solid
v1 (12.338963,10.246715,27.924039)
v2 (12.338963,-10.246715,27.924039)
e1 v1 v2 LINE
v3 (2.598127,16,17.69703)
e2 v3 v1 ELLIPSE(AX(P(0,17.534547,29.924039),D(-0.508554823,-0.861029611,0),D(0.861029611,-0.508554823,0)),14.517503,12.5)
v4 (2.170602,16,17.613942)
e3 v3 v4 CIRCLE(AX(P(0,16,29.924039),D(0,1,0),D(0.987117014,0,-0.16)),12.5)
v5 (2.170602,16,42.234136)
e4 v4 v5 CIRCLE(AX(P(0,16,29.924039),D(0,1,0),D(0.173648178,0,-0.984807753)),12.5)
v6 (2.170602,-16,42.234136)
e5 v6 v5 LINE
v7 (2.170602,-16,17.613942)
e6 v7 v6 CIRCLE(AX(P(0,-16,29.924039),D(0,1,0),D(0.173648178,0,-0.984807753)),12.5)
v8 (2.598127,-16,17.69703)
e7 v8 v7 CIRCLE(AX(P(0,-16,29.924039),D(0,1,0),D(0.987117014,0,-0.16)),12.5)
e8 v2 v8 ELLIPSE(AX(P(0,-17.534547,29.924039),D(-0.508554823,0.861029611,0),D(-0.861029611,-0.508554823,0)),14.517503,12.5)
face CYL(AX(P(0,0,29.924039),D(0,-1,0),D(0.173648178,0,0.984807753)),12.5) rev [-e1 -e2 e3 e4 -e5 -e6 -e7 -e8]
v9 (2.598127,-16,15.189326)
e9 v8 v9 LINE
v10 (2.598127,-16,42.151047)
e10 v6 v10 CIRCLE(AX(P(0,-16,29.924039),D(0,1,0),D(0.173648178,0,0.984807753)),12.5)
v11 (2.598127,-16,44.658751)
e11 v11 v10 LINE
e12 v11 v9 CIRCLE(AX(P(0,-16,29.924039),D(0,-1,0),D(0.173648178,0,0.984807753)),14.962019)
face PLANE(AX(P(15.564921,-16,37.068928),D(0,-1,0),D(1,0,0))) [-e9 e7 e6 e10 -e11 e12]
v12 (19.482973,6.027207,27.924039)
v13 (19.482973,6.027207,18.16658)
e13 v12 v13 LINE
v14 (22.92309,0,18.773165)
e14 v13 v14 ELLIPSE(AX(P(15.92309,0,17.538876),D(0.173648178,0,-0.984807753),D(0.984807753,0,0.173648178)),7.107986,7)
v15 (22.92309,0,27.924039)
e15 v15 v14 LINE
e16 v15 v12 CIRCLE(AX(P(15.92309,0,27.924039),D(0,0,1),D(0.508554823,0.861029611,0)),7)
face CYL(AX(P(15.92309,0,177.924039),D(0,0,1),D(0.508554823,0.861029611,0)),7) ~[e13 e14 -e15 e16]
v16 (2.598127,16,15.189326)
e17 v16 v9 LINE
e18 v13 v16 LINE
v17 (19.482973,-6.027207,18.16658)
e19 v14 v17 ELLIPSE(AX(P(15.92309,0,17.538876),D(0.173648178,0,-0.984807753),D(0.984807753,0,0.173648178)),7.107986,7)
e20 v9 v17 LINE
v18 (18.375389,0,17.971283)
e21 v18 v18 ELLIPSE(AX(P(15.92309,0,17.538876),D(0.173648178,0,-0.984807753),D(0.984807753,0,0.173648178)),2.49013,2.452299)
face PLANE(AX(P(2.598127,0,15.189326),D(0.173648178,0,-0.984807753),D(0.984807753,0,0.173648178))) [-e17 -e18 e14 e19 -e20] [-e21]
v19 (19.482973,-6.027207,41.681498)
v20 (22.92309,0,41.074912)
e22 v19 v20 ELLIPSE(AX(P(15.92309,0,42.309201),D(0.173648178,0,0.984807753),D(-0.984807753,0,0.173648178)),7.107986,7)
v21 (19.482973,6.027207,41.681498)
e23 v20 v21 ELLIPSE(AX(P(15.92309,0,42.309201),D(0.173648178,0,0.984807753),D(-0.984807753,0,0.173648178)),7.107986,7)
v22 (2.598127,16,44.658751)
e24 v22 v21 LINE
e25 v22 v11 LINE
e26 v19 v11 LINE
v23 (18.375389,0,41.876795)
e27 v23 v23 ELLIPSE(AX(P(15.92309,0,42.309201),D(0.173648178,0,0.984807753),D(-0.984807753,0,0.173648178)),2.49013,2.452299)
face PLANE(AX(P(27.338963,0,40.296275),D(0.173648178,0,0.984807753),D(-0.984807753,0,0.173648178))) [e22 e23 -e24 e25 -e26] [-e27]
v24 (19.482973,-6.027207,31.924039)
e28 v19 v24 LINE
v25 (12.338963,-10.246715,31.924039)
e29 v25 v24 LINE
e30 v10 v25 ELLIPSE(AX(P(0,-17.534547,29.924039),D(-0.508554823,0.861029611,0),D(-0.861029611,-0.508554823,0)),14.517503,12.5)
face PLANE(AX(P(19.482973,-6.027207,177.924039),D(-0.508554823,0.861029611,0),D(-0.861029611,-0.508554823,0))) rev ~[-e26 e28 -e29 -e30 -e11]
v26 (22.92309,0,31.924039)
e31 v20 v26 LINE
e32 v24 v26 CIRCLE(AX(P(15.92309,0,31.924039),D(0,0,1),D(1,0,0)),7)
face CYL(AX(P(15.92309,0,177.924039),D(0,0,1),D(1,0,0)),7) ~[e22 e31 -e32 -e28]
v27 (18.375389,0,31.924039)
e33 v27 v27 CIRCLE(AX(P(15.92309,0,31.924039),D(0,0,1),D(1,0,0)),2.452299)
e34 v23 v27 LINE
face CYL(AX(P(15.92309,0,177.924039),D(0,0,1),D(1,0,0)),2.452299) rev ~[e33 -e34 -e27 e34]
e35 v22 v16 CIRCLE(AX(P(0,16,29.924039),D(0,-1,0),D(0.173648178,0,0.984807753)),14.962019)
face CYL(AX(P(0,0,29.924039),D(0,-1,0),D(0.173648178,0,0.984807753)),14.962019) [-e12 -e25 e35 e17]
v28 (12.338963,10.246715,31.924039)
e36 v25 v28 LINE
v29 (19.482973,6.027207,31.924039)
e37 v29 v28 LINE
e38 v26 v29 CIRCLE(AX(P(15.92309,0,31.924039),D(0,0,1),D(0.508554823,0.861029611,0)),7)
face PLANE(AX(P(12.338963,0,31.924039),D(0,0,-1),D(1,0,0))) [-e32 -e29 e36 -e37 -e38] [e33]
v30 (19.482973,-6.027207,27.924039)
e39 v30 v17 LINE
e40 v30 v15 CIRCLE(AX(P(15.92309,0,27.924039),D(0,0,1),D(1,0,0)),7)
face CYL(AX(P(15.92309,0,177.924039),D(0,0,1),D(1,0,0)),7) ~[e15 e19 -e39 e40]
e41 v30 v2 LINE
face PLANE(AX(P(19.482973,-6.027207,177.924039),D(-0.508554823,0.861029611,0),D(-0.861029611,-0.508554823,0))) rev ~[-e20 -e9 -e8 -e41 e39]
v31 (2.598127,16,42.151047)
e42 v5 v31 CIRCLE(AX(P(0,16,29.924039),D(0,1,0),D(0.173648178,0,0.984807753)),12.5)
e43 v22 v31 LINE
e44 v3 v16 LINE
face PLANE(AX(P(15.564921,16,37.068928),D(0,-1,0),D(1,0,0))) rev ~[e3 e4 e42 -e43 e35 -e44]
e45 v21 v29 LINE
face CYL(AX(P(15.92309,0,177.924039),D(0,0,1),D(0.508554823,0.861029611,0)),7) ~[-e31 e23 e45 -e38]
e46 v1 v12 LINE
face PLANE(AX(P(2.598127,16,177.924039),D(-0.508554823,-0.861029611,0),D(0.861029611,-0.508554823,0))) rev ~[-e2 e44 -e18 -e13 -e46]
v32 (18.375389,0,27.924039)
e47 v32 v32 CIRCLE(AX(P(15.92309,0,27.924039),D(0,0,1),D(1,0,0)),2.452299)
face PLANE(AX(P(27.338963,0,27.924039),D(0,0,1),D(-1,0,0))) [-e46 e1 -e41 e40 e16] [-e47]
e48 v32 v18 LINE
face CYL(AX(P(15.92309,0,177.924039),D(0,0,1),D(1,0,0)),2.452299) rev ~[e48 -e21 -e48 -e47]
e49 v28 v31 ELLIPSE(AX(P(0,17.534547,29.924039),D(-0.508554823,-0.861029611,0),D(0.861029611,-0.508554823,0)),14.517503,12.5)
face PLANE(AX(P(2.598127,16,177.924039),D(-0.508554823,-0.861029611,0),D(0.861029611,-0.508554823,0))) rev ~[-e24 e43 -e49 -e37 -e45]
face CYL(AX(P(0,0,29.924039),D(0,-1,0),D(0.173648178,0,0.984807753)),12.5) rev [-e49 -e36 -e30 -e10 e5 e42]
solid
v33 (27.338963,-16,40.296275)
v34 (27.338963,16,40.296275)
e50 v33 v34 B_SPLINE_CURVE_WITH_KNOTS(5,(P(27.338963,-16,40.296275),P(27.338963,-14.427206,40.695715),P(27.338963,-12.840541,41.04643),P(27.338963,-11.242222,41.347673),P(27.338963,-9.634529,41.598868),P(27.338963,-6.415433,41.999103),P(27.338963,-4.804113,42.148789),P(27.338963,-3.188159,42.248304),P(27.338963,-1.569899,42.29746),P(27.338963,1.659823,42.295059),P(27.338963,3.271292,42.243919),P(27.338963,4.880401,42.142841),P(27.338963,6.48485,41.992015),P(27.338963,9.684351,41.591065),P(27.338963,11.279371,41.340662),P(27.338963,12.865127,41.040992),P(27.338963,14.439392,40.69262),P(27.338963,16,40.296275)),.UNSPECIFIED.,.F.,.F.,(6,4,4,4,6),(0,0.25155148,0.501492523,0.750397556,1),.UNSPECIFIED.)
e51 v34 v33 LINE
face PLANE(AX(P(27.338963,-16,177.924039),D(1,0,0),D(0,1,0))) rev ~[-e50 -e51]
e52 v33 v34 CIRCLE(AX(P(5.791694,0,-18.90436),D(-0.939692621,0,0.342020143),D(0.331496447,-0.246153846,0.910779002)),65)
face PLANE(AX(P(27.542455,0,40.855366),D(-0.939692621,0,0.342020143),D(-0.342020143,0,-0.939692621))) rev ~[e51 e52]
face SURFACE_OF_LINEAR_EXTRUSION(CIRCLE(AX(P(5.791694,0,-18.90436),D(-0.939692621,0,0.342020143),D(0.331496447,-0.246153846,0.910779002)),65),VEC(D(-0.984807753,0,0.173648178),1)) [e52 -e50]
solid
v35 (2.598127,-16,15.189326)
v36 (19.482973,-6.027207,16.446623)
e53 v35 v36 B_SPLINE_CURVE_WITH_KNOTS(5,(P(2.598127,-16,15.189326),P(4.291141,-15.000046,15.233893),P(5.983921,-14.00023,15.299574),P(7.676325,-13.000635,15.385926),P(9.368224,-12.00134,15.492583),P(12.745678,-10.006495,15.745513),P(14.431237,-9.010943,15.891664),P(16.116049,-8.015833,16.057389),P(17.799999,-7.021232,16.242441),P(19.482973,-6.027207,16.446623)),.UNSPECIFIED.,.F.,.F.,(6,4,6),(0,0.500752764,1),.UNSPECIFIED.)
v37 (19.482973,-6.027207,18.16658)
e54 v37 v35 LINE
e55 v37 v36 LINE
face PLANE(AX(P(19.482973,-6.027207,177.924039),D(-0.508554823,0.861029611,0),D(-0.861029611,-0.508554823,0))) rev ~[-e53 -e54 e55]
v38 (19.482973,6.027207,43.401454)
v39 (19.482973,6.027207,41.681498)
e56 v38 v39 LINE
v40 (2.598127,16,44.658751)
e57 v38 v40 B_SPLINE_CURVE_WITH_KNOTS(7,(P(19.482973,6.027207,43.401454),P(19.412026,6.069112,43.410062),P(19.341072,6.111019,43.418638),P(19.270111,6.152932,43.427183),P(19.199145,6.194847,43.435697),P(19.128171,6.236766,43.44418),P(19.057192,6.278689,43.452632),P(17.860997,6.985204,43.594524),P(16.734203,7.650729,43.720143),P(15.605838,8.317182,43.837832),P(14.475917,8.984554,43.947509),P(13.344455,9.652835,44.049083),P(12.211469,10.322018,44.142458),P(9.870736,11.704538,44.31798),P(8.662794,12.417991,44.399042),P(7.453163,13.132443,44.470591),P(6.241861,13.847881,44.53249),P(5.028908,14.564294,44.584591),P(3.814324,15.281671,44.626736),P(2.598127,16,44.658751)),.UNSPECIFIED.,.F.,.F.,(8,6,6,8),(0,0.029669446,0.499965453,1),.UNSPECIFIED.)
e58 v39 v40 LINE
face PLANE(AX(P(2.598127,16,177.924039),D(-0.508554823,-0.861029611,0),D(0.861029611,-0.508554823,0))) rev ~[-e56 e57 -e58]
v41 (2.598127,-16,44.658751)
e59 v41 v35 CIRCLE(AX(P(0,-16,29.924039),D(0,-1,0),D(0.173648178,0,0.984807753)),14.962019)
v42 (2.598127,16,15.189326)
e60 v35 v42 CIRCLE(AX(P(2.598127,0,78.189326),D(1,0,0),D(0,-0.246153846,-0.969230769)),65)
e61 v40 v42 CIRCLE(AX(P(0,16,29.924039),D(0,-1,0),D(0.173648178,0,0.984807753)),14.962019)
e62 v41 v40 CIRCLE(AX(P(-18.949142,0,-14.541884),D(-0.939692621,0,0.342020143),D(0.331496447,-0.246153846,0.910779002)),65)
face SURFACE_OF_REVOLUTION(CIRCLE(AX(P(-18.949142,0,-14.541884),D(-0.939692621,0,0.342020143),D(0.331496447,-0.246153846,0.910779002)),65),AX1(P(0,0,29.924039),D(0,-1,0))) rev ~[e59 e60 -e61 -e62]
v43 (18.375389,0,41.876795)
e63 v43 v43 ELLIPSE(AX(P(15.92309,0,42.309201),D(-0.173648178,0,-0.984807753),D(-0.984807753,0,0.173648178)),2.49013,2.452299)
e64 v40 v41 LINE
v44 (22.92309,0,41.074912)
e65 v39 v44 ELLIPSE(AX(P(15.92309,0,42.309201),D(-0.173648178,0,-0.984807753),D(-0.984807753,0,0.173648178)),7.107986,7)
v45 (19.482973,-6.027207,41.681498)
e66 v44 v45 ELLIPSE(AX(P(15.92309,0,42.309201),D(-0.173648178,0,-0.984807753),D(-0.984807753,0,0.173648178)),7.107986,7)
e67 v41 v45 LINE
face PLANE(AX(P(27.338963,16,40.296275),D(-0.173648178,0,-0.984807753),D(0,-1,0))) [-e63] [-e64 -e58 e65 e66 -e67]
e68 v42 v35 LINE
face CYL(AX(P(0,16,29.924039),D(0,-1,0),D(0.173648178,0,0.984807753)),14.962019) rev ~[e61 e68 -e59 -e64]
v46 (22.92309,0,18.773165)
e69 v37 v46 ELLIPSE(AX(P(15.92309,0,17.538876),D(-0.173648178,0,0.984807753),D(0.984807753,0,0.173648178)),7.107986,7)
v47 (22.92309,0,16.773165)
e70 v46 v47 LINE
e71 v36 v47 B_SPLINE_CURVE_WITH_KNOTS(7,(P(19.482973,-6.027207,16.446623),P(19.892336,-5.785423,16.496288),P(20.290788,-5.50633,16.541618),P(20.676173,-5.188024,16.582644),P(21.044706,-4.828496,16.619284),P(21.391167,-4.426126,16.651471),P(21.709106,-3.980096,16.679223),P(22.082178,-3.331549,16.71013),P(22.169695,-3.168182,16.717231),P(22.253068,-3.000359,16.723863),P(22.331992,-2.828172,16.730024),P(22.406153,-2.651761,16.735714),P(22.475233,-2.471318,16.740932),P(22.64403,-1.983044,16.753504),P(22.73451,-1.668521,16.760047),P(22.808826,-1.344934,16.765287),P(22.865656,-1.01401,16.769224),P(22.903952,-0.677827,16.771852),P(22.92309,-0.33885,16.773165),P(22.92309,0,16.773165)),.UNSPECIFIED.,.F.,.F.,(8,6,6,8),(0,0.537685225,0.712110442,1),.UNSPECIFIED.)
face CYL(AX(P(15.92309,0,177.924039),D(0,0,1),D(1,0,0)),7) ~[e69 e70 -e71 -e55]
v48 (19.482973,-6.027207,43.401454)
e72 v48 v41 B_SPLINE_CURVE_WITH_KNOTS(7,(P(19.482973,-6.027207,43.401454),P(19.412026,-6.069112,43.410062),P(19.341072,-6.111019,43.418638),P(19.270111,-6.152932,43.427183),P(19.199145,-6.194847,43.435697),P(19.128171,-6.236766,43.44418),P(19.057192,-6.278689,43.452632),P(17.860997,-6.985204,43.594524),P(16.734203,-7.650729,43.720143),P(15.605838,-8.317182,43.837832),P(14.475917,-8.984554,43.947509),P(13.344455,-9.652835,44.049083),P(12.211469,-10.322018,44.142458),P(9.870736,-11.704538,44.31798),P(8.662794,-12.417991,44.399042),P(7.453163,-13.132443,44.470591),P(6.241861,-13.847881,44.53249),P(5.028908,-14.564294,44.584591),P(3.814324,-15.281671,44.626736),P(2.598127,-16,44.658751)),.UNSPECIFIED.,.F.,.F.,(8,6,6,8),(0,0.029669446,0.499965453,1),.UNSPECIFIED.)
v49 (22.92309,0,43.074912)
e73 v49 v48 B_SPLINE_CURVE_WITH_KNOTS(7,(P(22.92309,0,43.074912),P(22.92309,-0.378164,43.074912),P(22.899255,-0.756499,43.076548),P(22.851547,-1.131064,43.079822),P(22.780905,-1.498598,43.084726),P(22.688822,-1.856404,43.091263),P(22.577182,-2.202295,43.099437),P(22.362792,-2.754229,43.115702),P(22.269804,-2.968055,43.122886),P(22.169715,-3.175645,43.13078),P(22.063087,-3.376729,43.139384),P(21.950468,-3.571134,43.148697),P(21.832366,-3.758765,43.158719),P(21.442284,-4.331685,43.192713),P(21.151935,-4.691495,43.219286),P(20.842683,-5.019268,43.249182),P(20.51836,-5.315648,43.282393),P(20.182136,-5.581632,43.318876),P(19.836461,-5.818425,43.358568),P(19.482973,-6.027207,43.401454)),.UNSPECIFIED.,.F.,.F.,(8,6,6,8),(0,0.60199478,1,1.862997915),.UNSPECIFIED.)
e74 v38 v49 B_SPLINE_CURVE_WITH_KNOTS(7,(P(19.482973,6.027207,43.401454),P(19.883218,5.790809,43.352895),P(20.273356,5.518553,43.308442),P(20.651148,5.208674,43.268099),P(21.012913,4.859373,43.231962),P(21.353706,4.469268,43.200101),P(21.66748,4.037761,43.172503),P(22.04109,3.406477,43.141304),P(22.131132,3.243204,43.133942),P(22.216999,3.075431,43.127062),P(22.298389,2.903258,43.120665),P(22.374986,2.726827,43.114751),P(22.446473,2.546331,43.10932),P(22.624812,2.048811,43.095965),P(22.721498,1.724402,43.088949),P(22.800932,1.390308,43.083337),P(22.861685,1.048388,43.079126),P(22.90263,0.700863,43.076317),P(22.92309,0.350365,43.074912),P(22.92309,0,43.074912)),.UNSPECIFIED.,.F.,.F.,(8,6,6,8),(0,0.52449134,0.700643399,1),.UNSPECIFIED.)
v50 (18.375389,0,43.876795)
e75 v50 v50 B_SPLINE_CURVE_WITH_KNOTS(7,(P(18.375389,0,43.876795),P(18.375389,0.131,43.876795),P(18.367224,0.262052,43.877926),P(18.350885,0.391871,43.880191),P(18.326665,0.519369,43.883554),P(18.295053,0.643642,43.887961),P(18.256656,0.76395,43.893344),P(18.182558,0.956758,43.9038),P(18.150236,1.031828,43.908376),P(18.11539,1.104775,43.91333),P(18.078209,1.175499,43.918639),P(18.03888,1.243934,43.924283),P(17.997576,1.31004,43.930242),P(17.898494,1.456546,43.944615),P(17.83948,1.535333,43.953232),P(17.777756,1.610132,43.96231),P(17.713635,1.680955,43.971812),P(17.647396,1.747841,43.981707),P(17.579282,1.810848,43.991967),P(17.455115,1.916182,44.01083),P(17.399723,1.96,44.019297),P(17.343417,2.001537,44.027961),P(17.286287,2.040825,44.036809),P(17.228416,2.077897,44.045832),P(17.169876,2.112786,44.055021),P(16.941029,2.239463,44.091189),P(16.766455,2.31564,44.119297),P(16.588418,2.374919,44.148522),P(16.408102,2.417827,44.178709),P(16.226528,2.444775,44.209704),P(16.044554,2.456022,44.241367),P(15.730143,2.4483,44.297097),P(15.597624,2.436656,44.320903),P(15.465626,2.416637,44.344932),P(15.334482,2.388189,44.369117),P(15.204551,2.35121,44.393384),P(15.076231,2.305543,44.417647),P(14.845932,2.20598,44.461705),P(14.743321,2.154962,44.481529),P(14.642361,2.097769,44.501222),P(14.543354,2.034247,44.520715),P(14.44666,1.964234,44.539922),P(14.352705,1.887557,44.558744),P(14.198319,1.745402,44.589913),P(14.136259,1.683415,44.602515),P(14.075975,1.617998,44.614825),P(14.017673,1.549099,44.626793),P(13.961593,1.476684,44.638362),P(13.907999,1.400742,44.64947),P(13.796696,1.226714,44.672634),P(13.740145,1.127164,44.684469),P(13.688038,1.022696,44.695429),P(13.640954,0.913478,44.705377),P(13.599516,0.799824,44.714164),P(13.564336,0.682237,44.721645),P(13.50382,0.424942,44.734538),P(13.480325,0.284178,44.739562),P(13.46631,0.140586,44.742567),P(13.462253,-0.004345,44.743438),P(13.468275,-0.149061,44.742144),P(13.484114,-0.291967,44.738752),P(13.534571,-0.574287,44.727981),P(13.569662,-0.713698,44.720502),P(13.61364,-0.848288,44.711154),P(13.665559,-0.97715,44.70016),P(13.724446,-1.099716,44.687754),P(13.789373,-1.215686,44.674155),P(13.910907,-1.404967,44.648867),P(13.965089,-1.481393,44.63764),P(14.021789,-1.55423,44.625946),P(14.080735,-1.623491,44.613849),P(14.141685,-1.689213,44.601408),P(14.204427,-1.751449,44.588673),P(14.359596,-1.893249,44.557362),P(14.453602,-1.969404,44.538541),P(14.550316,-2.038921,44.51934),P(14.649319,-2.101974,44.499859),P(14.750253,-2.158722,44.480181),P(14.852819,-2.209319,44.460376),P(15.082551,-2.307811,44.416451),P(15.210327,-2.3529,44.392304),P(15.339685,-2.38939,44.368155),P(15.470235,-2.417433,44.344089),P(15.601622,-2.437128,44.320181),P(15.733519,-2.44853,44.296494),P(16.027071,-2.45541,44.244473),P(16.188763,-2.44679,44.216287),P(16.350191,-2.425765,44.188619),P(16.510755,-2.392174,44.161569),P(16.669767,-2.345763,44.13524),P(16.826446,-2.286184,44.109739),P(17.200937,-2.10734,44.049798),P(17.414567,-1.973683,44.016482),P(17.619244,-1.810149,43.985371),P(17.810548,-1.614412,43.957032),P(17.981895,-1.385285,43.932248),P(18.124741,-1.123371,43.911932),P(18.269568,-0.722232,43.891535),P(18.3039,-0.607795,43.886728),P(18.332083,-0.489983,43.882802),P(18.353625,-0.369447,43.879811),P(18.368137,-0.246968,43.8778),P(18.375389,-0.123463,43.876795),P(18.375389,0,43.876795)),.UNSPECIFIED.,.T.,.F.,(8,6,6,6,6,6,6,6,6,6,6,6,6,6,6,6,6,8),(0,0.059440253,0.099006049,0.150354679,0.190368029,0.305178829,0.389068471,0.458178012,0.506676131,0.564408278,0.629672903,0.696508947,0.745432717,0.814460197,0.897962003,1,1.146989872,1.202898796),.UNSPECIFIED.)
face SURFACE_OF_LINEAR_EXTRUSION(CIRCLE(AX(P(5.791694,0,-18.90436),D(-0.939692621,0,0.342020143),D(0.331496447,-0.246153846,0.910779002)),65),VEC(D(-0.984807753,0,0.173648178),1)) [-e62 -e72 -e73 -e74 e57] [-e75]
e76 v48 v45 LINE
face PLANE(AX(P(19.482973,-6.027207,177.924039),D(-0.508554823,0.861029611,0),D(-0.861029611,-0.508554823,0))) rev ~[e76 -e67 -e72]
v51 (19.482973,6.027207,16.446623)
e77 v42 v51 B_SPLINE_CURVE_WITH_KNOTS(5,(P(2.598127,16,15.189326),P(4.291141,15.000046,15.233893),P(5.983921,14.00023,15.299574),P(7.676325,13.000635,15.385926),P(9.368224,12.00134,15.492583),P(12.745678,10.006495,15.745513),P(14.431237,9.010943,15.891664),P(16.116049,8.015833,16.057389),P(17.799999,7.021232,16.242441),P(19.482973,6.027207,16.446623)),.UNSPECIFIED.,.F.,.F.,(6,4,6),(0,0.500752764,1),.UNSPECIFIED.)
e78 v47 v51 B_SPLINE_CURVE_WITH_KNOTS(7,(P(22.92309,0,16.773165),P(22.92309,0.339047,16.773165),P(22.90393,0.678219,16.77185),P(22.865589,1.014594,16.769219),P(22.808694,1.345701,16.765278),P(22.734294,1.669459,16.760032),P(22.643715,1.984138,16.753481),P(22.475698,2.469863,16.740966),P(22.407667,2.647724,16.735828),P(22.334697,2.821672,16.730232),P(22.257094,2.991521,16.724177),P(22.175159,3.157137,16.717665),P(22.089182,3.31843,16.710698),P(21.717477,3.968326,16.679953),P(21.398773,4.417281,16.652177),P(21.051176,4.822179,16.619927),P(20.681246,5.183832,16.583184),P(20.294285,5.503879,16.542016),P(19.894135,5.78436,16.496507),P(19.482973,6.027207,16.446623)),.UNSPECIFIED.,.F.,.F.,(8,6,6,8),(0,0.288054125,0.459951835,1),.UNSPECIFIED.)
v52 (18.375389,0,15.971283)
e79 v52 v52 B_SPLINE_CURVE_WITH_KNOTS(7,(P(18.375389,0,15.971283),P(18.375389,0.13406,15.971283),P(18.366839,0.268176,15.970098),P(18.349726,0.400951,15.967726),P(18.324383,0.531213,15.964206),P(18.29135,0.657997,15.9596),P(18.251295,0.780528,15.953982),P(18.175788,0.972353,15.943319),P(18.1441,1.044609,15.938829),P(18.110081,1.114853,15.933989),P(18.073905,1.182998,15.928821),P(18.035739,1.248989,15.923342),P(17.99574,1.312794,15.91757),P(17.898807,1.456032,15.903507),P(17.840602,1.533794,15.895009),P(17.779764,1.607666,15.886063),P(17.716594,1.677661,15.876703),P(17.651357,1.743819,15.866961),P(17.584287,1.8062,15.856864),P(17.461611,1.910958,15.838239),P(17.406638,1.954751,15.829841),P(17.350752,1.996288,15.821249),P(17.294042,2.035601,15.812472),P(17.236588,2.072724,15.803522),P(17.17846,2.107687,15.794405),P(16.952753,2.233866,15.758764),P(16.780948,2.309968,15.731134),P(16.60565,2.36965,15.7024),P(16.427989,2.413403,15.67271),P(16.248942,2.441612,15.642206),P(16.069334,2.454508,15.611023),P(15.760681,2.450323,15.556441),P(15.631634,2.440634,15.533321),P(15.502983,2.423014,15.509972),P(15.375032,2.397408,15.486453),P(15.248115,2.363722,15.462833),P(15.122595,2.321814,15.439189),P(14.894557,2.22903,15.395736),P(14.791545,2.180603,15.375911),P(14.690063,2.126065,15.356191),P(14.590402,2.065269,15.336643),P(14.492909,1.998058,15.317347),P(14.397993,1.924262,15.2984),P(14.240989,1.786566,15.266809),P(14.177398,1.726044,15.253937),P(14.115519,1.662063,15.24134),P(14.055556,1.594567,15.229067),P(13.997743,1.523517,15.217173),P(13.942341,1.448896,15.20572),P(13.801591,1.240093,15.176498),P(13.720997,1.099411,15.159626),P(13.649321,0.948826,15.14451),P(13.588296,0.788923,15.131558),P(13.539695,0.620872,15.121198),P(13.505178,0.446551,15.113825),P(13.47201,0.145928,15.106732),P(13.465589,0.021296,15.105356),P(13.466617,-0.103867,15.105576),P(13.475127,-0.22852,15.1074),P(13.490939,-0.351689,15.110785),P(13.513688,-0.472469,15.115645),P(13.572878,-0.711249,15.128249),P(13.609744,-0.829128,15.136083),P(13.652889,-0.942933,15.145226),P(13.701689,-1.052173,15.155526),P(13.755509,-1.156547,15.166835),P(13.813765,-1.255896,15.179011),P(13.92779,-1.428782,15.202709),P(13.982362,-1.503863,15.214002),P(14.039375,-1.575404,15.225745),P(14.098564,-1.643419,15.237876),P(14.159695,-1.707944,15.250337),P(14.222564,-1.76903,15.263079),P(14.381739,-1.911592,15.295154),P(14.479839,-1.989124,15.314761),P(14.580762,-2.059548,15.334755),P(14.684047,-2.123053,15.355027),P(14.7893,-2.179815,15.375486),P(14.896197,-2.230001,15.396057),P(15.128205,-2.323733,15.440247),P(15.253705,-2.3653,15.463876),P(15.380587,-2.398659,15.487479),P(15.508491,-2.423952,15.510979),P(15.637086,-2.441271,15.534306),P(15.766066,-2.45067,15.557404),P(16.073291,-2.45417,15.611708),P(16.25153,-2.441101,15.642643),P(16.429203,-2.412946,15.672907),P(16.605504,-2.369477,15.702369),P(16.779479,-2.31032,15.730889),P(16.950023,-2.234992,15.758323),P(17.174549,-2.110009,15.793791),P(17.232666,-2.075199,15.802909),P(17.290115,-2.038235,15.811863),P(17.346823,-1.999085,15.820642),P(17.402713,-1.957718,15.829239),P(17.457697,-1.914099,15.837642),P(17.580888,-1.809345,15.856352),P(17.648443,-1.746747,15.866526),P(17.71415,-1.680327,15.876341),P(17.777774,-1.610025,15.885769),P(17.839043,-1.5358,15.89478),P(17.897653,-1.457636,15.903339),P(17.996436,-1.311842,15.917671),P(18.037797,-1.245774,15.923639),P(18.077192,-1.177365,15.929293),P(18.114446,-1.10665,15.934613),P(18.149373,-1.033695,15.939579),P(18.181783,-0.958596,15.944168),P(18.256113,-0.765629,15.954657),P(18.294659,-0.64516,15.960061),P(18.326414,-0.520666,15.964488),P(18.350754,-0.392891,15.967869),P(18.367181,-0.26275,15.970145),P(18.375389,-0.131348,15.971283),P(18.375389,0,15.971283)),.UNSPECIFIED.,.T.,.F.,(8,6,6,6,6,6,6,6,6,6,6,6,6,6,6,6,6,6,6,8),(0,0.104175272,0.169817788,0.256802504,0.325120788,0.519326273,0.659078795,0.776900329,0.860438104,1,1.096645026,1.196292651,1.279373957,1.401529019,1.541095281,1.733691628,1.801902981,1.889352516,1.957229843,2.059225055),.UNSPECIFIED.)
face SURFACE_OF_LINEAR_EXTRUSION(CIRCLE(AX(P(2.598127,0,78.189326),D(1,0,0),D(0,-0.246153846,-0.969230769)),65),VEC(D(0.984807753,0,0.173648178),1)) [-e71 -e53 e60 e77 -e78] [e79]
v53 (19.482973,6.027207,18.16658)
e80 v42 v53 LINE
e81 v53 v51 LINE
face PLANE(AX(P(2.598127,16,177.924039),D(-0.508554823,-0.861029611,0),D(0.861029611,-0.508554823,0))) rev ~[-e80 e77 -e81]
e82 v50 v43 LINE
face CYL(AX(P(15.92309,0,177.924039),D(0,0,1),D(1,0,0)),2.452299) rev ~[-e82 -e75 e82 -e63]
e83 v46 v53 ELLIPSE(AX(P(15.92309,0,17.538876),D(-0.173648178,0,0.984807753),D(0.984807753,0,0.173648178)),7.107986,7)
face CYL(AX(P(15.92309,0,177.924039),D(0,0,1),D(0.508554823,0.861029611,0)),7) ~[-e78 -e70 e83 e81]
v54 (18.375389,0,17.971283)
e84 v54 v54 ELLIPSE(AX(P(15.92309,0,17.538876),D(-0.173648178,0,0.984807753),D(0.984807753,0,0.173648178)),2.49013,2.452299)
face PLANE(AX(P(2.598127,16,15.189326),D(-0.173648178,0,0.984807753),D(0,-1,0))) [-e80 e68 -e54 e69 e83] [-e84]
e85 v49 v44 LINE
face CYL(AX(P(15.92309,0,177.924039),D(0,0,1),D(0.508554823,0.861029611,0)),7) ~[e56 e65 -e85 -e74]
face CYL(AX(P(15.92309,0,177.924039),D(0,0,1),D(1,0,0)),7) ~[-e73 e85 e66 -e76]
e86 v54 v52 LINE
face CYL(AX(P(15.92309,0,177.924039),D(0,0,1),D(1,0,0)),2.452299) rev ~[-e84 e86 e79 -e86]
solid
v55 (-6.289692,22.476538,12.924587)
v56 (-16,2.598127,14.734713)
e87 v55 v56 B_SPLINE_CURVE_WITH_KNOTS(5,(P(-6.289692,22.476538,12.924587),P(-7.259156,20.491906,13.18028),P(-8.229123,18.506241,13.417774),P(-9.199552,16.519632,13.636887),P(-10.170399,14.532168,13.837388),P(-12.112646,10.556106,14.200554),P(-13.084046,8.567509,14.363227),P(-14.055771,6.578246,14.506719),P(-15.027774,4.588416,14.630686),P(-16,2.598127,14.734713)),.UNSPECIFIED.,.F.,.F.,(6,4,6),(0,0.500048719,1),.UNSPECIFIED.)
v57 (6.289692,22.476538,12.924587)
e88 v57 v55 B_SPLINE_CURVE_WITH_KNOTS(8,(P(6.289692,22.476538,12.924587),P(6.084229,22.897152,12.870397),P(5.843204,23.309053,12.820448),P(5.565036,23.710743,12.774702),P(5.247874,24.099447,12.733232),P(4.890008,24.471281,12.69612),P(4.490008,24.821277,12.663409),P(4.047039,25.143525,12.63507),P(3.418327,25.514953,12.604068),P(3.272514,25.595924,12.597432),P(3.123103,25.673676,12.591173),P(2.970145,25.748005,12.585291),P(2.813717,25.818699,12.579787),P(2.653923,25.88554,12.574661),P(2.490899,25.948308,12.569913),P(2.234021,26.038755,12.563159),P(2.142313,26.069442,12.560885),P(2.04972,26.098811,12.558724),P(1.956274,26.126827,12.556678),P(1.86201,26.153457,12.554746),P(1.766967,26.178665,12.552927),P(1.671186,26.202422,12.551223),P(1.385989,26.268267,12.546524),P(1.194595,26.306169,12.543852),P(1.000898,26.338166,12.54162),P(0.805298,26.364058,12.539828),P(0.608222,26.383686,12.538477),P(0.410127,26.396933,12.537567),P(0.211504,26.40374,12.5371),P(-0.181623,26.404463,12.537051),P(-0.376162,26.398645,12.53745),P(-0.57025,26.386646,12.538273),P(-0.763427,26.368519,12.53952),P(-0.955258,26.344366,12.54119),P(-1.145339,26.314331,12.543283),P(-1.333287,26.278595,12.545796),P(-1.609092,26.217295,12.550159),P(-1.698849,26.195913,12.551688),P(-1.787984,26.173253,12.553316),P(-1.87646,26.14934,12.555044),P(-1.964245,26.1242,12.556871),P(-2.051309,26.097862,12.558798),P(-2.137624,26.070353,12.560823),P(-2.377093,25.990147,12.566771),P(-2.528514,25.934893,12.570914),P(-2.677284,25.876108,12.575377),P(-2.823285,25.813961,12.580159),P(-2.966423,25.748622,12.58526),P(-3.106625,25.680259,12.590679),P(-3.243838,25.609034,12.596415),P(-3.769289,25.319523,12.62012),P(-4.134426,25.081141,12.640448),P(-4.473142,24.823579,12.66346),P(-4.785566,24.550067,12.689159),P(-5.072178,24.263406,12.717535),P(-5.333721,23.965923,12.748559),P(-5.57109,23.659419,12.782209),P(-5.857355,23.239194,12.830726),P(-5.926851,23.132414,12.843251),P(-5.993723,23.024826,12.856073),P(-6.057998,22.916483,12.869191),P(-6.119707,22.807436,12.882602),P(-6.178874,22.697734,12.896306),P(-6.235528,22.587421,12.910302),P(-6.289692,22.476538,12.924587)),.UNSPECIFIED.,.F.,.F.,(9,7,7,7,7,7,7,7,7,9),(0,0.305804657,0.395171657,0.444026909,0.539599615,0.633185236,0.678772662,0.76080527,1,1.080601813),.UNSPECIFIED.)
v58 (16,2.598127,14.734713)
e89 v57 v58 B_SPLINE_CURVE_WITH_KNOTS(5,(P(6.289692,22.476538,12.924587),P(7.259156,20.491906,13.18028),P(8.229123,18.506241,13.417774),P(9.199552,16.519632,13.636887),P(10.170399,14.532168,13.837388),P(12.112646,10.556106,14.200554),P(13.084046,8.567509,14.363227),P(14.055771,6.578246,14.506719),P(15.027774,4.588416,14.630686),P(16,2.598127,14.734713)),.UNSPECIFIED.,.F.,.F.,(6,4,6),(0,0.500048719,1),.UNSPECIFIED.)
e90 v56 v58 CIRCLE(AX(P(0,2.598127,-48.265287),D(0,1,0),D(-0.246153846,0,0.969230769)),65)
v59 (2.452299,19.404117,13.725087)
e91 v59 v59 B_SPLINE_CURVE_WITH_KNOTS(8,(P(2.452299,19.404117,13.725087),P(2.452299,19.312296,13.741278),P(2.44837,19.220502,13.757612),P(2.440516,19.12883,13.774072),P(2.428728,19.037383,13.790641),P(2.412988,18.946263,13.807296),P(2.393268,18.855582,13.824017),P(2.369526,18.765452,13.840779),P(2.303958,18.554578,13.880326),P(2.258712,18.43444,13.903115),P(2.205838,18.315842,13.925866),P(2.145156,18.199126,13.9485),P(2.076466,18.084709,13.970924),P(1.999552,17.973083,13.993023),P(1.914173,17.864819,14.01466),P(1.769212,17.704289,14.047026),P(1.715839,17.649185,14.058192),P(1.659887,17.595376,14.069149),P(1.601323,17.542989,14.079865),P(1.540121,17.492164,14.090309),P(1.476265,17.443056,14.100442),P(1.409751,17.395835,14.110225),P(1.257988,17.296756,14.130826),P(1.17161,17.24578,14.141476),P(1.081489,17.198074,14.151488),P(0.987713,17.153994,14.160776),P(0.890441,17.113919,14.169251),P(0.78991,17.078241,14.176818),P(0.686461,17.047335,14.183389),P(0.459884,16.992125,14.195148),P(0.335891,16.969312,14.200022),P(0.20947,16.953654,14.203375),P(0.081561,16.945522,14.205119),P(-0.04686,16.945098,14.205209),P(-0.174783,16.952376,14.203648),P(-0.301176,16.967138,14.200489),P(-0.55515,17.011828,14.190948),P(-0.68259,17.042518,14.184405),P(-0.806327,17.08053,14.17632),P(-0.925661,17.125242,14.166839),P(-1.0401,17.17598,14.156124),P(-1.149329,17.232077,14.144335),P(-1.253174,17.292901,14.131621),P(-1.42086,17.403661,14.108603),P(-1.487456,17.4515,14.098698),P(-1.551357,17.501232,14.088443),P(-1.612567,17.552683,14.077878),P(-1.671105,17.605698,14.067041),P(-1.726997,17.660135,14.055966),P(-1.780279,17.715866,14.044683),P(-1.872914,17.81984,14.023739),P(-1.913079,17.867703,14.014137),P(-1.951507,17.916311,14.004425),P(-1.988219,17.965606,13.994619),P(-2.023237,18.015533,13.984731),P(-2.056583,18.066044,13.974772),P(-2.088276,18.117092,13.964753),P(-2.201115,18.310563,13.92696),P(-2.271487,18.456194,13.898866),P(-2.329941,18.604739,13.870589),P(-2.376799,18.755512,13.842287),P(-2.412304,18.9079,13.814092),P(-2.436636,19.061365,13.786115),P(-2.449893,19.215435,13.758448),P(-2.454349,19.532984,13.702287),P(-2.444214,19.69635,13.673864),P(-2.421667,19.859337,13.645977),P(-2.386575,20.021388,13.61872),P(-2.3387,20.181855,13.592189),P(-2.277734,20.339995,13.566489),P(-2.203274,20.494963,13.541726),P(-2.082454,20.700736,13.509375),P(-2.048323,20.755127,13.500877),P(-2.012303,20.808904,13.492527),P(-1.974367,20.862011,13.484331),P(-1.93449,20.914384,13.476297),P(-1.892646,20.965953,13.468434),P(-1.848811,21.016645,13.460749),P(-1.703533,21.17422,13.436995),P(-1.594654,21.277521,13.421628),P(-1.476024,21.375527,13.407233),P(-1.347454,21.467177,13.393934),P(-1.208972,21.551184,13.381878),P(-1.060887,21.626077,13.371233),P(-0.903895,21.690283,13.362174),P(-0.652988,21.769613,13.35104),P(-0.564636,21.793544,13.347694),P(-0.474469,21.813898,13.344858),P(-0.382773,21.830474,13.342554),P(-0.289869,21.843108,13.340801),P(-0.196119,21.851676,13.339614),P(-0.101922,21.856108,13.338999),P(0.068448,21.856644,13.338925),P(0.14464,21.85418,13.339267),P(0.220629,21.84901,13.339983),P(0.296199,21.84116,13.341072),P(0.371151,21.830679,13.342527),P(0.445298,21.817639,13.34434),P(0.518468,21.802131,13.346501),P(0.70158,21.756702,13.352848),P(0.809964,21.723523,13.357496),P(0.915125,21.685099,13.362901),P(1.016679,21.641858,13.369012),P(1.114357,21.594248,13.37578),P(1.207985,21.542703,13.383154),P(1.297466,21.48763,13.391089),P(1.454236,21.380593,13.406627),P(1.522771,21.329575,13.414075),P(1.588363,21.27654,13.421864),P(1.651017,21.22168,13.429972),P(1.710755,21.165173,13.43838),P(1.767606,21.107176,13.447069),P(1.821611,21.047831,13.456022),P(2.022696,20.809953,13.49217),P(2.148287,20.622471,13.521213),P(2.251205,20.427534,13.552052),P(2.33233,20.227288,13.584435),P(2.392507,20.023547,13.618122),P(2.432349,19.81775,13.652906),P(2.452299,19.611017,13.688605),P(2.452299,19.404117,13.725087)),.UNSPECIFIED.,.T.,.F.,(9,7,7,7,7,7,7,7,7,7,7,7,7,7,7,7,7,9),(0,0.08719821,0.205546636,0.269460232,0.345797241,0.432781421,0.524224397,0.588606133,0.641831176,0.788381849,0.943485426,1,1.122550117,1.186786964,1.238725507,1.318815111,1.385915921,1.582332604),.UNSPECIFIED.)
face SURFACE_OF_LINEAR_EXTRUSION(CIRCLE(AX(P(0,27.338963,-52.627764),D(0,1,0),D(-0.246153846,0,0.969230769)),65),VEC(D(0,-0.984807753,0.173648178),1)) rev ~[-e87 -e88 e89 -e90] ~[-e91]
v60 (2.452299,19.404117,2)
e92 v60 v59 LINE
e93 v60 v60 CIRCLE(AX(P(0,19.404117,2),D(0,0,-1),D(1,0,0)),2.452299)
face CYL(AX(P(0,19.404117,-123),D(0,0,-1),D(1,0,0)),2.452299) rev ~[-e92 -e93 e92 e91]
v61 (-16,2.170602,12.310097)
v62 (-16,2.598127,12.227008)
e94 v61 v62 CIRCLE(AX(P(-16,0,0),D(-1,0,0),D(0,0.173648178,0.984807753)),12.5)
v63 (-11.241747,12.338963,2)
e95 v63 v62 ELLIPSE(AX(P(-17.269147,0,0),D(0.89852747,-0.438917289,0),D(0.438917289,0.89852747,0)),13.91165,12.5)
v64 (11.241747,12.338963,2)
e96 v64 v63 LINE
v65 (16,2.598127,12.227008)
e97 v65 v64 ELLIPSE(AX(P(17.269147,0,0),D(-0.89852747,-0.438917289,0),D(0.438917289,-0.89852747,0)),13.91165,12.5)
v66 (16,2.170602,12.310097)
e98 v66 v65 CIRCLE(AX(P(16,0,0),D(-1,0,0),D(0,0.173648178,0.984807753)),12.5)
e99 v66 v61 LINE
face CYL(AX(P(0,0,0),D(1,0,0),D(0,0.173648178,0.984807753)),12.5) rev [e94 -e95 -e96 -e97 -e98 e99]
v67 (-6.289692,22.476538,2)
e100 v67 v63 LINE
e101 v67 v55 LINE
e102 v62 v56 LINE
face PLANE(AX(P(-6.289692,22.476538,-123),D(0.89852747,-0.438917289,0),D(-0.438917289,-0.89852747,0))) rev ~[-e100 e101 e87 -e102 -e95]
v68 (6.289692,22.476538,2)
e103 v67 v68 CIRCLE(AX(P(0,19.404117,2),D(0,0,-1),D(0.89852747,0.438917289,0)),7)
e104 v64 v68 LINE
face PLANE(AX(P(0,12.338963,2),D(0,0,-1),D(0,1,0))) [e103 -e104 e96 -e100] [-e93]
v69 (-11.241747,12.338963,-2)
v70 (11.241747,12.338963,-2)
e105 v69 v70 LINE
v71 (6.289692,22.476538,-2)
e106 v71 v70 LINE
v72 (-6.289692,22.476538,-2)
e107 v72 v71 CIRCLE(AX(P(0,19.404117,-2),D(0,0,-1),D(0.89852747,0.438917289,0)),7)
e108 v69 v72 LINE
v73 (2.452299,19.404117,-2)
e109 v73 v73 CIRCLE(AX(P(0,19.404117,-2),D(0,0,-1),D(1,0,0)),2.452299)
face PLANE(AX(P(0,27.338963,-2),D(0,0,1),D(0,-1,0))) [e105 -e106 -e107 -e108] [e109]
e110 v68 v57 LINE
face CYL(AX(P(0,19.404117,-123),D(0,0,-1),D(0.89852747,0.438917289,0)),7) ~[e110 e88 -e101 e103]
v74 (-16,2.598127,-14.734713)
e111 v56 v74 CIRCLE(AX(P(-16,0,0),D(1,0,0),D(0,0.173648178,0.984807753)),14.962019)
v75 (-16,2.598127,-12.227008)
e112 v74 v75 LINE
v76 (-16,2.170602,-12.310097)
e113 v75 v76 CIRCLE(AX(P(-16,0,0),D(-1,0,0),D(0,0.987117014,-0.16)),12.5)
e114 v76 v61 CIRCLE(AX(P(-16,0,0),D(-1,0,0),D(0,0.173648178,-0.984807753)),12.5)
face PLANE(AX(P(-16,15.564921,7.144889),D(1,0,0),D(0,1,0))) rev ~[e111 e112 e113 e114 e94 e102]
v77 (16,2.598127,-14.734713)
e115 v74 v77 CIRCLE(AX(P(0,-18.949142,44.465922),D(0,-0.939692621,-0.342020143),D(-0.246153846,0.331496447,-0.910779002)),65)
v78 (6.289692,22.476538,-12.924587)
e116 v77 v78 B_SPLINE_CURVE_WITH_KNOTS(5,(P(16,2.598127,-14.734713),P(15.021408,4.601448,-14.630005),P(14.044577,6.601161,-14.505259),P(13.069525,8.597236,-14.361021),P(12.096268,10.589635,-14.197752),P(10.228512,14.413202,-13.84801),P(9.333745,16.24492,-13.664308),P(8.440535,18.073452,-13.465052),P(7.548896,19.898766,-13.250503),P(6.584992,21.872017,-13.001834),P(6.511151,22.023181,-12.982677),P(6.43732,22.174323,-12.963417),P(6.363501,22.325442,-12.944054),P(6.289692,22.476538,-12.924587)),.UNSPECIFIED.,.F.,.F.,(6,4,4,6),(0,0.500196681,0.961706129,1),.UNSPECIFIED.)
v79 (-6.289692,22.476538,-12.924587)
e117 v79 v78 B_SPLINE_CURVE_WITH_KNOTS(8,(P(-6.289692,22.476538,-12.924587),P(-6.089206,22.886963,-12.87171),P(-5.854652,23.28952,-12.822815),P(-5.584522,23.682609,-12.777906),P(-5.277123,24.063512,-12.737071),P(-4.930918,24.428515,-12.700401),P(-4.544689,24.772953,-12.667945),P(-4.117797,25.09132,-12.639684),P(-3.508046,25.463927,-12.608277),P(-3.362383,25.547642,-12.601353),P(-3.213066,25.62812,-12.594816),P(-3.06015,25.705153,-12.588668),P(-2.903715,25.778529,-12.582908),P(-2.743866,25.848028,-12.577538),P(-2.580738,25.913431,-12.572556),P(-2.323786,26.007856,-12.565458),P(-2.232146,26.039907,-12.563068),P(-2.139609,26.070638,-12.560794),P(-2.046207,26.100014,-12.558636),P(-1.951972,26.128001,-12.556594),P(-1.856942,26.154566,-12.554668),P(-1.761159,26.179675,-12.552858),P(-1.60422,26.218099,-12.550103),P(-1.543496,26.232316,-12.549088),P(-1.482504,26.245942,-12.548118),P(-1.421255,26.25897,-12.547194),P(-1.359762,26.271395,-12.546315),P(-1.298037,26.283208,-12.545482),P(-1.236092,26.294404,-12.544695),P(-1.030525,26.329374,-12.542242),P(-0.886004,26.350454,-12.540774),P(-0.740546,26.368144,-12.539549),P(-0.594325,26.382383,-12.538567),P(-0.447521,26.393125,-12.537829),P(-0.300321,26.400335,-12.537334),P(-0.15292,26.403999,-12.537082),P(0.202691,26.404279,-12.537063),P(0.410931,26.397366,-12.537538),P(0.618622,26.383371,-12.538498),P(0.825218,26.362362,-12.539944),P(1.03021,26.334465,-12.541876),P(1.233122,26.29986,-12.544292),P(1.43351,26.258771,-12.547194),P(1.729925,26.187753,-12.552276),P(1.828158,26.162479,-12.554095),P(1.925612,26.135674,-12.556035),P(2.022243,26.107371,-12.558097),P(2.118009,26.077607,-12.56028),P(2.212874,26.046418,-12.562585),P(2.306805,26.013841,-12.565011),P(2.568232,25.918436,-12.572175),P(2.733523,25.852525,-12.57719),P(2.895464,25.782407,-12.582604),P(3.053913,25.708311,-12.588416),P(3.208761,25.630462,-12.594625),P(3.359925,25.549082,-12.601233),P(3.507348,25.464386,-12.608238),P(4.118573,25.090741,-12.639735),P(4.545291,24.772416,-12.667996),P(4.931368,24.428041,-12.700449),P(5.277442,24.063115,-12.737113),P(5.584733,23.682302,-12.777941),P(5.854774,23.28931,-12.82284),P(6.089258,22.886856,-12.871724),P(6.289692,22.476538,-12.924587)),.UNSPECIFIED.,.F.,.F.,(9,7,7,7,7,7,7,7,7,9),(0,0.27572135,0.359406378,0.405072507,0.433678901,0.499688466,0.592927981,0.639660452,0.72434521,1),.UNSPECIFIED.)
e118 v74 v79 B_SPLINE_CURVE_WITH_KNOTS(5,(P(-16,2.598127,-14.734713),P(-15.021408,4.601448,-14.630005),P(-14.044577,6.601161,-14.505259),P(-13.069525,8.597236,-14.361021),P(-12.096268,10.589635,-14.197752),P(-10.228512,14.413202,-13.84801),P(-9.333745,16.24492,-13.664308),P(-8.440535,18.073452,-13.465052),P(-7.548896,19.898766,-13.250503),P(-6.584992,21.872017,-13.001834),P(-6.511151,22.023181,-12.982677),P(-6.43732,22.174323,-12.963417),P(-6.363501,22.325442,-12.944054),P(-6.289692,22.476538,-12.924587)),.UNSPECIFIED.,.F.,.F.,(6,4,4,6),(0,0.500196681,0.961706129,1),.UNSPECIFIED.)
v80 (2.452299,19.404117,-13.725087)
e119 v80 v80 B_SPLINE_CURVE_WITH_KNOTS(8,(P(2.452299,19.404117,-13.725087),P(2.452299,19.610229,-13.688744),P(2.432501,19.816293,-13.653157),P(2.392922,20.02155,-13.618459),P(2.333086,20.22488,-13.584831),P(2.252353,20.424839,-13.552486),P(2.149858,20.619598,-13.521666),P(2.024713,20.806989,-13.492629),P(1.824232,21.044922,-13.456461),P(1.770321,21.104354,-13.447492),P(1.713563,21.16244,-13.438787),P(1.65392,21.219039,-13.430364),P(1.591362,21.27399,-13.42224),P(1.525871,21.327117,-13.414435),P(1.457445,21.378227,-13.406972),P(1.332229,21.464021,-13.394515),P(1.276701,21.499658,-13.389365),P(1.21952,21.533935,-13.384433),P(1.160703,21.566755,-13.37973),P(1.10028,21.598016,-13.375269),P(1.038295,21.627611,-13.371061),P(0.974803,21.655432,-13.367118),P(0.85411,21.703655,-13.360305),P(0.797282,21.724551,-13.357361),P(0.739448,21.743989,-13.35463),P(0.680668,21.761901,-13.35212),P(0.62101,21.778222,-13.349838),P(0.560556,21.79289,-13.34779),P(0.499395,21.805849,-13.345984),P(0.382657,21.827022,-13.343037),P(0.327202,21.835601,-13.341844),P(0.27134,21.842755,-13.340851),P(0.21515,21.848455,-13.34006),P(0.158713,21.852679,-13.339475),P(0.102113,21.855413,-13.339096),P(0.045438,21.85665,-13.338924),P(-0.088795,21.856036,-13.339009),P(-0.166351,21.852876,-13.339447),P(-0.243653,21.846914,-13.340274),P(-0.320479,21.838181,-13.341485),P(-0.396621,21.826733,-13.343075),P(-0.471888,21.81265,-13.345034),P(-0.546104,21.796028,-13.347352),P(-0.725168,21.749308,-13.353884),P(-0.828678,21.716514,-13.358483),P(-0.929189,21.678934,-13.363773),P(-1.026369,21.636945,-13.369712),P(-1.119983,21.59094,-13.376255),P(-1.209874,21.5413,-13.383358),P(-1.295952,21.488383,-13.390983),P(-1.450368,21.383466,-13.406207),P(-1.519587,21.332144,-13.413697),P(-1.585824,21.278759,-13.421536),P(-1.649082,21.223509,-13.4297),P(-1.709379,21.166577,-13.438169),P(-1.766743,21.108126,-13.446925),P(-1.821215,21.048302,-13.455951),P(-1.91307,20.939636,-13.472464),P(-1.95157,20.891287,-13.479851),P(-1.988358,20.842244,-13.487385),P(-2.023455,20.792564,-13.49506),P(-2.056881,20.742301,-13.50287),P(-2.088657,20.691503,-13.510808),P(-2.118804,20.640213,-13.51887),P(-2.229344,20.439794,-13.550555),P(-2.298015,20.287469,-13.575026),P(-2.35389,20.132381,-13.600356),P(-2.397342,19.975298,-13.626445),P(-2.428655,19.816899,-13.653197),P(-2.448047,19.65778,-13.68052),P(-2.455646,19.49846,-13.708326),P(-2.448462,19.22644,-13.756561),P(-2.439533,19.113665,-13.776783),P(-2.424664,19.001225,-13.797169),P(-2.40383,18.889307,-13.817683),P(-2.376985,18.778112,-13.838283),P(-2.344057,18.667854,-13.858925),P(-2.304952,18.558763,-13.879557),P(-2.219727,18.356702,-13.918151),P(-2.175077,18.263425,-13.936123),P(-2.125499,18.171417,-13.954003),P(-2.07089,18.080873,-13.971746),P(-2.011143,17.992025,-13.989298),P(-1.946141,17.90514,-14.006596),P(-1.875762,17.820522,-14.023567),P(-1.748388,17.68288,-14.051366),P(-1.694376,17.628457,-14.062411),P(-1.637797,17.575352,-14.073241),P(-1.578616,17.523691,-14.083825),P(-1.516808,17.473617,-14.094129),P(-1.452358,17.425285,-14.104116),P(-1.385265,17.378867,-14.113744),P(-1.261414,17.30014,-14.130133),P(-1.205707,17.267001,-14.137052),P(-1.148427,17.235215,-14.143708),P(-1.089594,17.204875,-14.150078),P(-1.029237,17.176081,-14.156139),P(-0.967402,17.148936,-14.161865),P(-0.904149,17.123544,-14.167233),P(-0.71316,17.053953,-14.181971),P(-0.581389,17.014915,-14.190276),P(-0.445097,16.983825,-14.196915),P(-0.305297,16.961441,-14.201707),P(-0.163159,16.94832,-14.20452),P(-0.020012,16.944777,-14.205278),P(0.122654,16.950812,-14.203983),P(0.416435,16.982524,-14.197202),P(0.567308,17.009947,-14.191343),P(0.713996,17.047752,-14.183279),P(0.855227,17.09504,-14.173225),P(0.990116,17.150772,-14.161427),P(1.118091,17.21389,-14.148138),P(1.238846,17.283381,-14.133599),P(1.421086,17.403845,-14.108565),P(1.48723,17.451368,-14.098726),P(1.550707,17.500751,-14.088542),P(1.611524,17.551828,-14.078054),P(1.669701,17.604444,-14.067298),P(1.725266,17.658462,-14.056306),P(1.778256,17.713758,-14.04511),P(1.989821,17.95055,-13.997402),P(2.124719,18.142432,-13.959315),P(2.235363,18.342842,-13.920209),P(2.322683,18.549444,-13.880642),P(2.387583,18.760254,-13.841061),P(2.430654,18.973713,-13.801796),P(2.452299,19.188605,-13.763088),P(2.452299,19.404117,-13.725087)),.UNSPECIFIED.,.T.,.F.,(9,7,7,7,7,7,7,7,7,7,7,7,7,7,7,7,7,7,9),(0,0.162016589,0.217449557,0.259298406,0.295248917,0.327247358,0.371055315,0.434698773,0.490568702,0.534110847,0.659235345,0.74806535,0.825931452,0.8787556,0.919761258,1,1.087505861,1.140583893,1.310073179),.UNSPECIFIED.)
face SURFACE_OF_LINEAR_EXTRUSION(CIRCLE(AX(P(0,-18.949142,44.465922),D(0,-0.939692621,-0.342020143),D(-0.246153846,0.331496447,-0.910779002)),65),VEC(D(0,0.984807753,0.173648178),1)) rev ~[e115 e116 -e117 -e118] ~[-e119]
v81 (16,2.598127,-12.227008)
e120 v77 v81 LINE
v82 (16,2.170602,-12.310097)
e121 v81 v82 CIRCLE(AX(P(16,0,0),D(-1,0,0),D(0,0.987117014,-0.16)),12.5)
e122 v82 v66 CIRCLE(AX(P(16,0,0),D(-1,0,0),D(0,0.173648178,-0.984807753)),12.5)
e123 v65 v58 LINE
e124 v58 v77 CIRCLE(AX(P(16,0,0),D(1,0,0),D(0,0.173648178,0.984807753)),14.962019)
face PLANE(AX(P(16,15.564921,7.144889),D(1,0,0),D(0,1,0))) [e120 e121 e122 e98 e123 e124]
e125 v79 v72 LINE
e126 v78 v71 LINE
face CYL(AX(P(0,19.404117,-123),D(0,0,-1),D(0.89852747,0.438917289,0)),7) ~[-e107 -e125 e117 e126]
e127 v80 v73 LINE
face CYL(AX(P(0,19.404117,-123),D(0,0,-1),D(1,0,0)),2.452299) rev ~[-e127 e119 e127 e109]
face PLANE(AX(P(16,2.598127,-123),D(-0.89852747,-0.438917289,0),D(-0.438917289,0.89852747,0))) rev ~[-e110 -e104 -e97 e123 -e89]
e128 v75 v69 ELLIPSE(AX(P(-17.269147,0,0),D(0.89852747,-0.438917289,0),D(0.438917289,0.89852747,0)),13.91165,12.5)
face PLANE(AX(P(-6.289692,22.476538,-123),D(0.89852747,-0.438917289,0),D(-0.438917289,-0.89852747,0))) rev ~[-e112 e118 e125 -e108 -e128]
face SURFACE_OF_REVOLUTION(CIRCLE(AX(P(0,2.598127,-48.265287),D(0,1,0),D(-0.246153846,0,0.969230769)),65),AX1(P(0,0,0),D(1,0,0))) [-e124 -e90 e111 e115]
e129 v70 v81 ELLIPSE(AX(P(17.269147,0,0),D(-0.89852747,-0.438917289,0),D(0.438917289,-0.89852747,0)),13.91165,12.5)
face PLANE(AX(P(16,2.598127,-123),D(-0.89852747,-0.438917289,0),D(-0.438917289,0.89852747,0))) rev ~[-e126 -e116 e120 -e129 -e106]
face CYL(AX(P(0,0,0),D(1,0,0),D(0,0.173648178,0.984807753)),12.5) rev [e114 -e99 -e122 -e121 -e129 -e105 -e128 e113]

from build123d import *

# Parameters (mm, degrees)
F1_DEPTH  = 16
F5_DEPTH  = 16
F10_START = -25
F9_R      = 2.4522993316
F10_DEPTH = 167.5566196442
F12_R     = 2.4522993316
F13_DEPTH = 195.4795867205


with BuildPart() as f1:
    # F0 (on Right) → F1 (new body, symmetric)
    with BuildSketch(Plane.YZ):
        with BuildLine():
            Line((27.3389626793, 2), (27.3389626793, 7.8722359036))
            Line((27.3389626793, 7.8722359036), (2.1706022208, 12.3100969127))
            ThreePointArc((2.1706022208, 12.3100969127), (8.8997973564, 8.777448776), (12.3389626793, 2))
            Line((12.3389626793, 2), (27.3389626793, 2))
        make_face()
        with BuildLine():
            Line((27.3389626793, 10.3722359036), (2.5981274, 14.7347126886))
            ThreePointArc((2.5981274, 14.7347126886), (-14.9620193825, 0), (2.5981274, -14.7347126886))
            Line((2.5981274, -14.7347126886), (27.3389626793, -10.3722359036))
            Line((27.3389626793, -10.3722359036), (27.3389626793, -7.8722359036))
            Line((27.3389626793, -7.8722359036), (2.1706022208, -12.3100969127))
            ThreePointArc((2.1706022208, -12.3100969127), (-12.5, 0), (2.1706022208, 12.3100969127))
            Line((2.1706022208, 12.3100969127), (27.3389626793, 7.8722359036))
            Line((27.3389626793, 7.8722359036), (27.3389626793, 10.3722359036))
        make_face()
        with BuildLine():
            Line((2.1706022208, -12.3100969127), (27.3389626793, -7.8722359036))
            Line((27.3389626793, -7.8722359036), (27.3389626793, -2))
            Line((27.3389626793, -2), (12.3389626793, -2))
            ThreePointArc((12.3389626793, -2), (8.8997973564, -8.777448776), (2.1706022208, -12.3100969127))
        make_face()
    extrude(amount=F1_DEPTH, both=True)

    # F3: sweep along a path in F3_path
    with BuildLine(Plane(origin=(16, 27.3389626793, 10.3722359036), x_dir=(0, 0, 1), z_dir=(1, 0, 0))) as f3_path:
        Line((0, 0), (4.362476785, 24.7408352793))
        ThreePointArc((4.362476785, 24.7408352793), (-10.3722359036, 42.3009820618), (-25.1069485923, 24.7408352793))
        Line((-25.1069485923, 24.7408352793), (-20.7444718073, 0))
    # F2 (on face) → F3 (sweep)
    with BuildSketch(Plane(origin=(0, 27.3389626793, 0), x_dir=(-1, 0, 0), z_dir=(0, 1, 0))):
        with BuildLine():
            Line((-16, 10.3722359036), (16, 10.3722359036))
            ThreePointArc((16, 10.3722359036), (0, 12.3722359036), (-16, 10.3722359036))
        make_face()
    sweep(path=f3_path.line)

    # F9 (on offset) → F10 (cut)
    with BuildSketch(Plane(origin=(0, 0, -148), x_dir=(1, 0, 0), z_dir=(0, 0, -1)).offset(F10_START)):
        with BuildLine():
            Line((-16, -2.5981274), (-16, -31.1659335838))
            Line((-16, -31.1659335838), (16, -31.1659335838))
            Line((16, -31.1659335838), (16, -2.5981274))
            Line((16, -2.5981274), (6.2896922875, -22.4765383075))
            ThreePointArc((6.2896922875, -22.4765383075), (0, -26.4041172869), (-6.2896922875, -22.4765383075))
            Line((-6.2896922875, -22.4765383075), (-16, -2.5981274))
        make_face()
        with Locations((0, -19.4041172869)):
            Circle(F9_R)
    extrude(amount=-F10_DEPTH, mode=Mode.SUBTRACT)


with BuildPart() as f5:
    # F4 (on Front) → F5 (new body, symmetric)
    with BuildSketch(Plane.XZ):
        with BuildLine():
            Line((27.3389626793, 31.9240387651), (27.3389626793, 37.7962746687))
            Line((27.3389626793, 37.7962746687), (2.1706022208, 42.2341356777))
            ThreePointArc((2.1706022208, 42.2341356777), (8.8997973564, 38.7014875411), (12.3389626793, 31.9240387651))
            Line((12.3389626793, 31.9240387651), (27.3389626793, 31.9240387651))
        make_face()
        with BuildLine():
            Line((27.3389626793, 40.2962746687), (2.5981274, 44.6587514537))
            ThreePointArc((2.5981274, 44.6587514537), (-14.9620193825, 29.9240387651), (2.5981274, 15.1893260764))
            Line((2.5981274, 15.1893260764), (27.3389626793, 19.5518028614))
            Line((27.3389626793, 19.5518028614), (27.3389626793, 22.0518028614))
            Line((27.3389626793, 22.0518028614), (2.1706022208, 17.6139418524))
            ThreePointArc((2.1706022208, 17.6139418524), (-12.5, 29.9240387651), (2.1706022208, 42.2341356777))
            Line((2.1706022208, 42.2341356777), (27.3389626793, 37.7962746687))
            Line((27.3389626793, 37.7962746687), (27.3389626793, 40.2962746687))
        make_face()
        with BuildLine():
            Line((2.1706022208, 17.6139418524), (27.3389626793, 22.0518028614))
            Line((27.3389626793, 22.0518028614), (27.3389626793, 27.9240387651))
            Line((27.3389626793, 27.9240387651), (12.3389626793, 27.9240387651))
            ThreePointArc((12.3389626793, 27.9240387651), (8.8997973564, 21.1465899891), (2.1706022208, 17.6139418524))
        make_face()
    extrude(amount=F5_DEPTH, both=True)


with BuildPart() as f7:
    # F7: sweep along a path in F7_path
    with BuildLine(Plane(origin=(27.3389626793, -16, 40.2962746687), x_dir=(0, 0, 1), z_dir=(0, -1, 0))) as f7_path:
        Line((0, 0), (4.362476785, 24.7408352793))
        ThreePointArc((4.362476785, 24.7408352793), (-10.3722359036, 42.3009820618), (-25.1069485923, 24.7408352793))
        Line((-25.1069485923, 24.7408352793), (-20.7444718073, 0))
    # F6 (on face) → F7 (sweep)
    with BuildSketch(Plane.YZ.offset(27.3389626793)):
        with BuildLine():
            Line((16, 19.5518028614), (-16, 19.5518028614))
            ThreePointArc((-16, 19.5518028614), (0, 17.5518028614), (16, 19.5518028614))
        make_face()
    sweep(path=f7_path.line)


with BuildPart() as f13_tool:
    # F12 (on offset) → F13 (new body)
    with BuildSketch(Plane.XY.offset(177.9240387651)):
        with BuildLine():
            Line((2.5981274, -16), (27.3389626793, -16))
            Line((27.3389626793, -16), (27.3389626793, 16))
            Line((27.3389626793, 16), (2.5981274, 16))
            Line((2.5981274, 16), (19.4829733323, 6.0272072796))
            ThreePointArc((19.4829733323, 6.0272072796), (22.0025297711, 3.469928937), (22.9230895689, 0))
            ThreePointArc((22.9230895689, 0), (22.0025297711, -3.469928937), (19.4829733323, -6.0272072796))
            Line((19.4829733323, -6.0272072796), (2.5981274, -16))
        make_face()
        with Locations((15.9230895689, 0)):
            Circle(F12_R)
    extrude(amount=-F13_DEPTH)


with BuildPart() as f5_1:
    add(f5.part)

    # F13: cut by f13_tool
    add(f13_tool.part, mode=Mode.SUBTRACT)


with BuildPart() as f7_1:
    add(f7.part)

    # F13: cut by f13_tool
    add(f13_tool.part, mode=Mode.SUBTRACT)


solid = Compound([f1.part, f5_1.part, f7_1.part])
